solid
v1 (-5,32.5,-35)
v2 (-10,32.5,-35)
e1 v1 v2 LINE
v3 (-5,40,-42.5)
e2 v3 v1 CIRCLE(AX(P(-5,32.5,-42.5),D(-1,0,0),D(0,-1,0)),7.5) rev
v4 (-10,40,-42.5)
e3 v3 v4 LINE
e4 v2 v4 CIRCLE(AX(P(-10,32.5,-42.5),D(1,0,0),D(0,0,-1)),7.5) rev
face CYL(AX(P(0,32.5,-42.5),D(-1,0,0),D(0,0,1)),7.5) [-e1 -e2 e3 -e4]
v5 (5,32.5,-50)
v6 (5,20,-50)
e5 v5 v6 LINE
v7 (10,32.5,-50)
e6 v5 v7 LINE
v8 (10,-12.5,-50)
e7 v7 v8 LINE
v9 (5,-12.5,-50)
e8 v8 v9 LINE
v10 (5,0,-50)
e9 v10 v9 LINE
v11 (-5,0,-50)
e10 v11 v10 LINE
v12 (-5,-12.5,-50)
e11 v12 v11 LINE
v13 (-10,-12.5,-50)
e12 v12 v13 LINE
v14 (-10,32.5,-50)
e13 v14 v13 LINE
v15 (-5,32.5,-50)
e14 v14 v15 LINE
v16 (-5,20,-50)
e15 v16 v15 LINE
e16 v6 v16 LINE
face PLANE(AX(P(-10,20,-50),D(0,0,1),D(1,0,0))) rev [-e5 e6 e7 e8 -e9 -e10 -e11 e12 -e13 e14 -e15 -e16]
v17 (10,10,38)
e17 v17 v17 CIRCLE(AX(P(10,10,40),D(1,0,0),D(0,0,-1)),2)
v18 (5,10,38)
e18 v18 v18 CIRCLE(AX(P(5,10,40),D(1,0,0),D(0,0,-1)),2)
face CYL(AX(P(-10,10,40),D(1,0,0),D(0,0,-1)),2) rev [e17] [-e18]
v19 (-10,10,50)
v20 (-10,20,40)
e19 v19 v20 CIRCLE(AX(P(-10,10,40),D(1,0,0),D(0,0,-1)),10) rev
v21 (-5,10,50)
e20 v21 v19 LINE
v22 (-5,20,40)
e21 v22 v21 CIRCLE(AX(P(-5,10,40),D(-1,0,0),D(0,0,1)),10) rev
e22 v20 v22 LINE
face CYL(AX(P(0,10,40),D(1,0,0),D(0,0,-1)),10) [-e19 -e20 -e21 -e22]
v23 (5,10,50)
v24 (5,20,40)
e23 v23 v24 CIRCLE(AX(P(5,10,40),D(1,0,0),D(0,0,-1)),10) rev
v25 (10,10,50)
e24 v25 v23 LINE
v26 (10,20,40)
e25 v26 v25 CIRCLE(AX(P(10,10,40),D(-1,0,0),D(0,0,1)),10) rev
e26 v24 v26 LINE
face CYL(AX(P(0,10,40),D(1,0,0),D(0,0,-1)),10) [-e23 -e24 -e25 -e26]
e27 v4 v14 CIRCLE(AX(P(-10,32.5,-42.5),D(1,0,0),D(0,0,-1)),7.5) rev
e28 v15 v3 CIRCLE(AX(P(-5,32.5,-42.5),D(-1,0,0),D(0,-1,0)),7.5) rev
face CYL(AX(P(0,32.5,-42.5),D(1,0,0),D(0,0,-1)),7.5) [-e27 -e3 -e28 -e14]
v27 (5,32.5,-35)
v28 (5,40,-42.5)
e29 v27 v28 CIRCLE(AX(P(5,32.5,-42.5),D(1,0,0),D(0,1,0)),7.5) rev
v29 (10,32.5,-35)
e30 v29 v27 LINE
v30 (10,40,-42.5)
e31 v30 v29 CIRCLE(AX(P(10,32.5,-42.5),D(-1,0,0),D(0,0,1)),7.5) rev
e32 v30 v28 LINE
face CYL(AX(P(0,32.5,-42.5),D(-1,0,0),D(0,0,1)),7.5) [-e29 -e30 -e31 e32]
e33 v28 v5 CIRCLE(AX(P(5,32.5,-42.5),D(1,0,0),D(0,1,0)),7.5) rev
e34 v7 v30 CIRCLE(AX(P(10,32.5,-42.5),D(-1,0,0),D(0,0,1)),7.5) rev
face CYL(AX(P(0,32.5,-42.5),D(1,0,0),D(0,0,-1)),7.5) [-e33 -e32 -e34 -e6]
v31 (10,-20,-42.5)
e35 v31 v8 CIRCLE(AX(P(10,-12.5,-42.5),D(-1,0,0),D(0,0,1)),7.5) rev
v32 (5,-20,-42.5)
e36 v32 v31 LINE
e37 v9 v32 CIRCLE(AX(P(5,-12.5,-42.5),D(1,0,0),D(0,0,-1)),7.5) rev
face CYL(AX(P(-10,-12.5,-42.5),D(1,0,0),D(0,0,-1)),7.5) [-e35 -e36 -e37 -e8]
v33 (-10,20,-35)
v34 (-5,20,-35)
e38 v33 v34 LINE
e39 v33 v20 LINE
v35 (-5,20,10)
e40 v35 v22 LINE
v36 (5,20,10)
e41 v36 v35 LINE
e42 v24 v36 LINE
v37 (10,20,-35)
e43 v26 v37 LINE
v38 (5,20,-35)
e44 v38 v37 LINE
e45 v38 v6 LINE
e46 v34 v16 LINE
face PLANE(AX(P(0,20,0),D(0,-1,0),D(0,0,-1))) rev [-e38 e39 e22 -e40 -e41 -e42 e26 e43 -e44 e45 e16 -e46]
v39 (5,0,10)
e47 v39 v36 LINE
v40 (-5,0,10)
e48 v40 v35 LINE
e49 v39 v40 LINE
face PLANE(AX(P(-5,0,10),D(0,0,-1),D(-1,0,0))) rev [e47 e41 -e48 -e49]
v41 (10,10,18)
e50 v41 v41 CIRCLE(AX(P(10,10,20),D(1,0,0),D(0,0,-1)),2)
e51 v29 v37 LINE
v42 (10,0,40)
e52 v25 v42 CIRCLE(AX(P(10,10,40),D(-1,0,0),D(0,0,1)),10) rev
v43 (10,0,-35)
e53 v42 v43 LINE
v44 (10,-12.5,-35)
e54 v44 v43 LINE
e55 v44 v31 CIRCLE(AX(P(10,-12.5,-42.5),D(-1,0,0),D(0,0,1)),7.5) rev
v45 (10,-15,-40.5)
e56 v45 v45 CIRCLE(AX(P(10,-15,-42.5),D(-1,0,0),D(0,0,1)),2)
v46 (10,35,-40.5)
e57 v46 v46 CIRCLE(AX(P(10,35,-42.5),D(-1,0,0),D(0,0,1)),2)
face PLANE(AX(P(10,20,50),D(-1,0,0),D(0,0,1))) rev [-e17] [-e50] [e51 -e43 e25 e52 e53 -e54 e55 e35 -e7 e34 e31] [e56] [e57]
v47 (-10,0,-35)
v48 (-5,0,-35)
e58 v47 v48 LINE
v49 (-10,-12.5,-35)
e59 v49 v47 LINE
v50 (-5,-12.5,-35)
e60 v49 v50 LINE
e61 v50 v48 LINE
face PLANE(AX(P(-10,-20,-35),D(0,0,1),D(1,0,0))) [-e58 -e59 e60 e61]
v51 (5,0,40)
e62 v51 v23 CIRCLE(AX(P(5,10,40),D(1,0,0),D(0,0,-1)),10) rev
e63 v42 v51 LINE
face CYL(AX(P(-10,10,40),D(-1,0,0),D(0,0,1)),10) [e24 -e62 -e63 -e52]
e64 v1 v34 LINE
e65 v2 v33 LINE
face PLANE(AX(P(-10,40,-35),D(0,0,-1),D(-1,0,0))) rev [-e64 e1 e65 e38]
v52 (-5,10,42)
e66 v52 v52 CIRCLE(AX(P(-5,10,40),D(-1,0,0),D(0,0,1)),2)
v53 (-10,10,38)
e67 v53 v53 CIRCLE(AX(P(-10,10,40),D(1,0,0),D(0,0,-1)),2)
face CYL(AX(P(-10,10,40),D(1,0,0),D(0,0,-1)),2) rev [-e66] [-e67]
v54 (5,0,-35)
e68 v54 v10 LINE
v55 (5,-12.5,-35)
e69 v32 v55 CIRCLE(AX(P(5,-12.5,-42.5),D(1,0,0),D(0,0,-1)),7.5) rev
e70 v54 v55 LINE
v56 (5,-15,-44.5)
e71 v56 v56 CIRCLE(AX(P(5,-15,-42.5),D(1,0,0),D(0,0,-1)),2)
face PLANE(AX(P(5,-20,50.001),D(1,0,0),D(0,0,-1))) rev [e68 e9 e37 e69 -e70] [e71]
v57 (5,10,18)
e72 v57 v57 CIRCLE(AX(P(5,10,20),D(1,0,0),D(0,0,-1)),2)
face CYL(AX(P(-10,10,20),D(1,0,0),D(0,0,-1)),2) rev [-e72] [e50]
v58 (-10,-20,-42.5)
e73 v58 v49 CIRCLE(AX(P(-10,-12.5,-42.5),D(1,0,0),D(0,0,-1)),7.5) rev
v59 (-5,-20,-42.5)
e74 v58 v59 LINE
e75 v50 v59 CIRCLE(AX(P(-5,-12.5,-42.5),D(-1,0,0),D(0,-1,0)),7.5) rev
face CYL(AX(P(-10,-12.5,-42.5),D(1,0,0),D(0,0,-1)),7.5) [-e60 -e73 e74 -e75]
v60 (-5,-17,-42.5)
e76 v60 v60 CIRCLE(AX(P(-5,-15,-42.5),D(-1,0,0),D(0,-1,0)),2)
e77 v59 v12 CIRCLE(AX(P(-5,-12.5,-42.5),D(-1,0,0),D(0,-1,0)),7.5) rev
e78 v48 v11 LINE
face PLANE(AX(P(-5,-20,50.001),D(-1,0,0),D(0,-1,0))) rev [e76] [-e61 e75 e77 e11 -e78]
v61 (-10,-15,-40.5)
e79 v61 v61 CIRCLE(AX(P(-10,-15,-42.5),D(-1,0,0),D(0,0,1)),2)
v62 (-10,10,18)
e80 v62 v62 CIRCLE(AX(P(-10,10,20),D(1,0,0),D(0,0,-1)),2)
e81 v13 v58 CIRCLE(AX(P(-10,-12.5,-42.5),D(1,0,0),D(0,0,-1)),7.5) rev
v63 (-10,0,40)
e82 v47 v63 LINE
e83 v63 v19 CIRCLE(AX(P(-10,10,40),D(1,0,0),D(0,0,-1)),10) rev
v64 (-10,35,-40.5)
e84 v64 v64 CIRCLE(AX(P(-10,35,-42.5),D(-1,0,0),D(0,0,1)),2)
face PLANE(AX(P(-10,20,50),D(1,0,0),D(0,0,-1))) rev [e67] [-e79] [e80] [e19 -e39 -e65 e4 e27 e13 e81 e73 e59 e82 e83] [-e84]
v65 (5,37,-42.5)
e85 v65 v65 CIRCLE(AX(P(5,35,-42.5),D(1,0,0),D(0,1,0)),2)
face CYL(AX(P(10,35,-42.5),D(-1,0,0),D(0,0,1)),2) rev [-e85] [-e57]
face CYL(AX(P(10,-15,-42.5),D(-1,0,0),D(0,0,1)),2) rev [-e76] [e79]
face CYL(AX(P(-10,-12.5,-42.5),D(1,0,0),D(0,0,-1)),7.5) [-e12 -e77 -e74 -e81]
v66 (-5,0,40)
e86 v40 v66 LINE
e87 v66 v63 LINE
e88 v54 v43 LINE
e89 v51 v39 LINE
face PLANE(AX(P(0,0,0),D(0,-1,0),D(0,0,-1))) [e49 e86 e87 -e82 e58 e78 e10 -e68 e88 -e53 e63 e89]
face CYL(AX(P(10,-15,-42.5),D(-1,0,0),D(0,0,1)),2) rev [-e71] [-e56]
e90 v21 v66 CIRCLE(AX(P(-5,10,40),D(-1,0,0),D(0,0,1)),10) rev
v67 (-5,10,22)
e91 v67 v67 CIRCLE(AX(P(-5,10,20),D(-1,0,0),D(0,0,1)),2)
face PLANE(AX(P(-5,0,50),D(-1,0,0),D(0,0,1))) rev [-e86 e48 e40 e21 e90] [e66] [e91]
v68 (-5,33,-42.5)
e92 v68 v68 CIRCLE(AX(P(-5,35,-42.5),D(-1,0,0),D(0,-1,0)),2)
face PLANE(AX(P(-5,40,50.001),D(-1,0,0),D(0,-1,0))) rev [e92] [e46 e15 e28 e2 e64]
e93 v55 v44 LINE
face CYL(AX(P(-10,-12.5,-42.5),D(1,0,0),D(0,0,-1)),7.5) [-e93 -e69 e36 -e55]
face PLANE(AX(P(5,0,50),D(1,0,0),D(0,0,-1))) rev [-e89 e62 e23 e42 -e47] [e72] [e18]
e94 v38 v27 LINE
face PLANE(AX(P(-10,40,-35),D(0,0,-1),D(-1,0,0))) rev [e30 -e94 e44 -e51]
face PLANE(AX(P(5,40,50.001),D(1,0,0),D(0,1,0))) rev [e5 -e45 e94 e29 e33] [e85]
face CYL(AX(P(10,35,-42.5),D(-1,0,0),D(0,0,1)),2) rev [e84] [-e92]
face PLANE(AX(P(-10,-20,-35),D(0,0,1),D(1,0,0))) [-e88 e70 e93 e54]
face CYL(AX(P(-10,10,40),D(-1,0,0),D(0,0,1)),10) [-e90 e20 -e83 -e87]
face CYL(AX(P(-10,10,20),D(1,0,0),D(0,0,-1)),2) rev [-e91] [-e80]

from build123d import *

# Parameters (mm, degrees)
SKETCH1_W           = 20
SKETCH1_H           = 100
BOSS_EXTRUDE1_DEPTH = 20
SKETCH2_W           = 10
SKETCH2_H           = 40
CUT_EXTRUDE1_DEPTH  = 55.772255751
SKETCH3_R           = 2
CUT_EXTRUDE2_DEPTH  = 58.445626465
FILLET1_R           = 10
SKETCH4_W           = 20
SKETCH4_H           = 15
BOSS_EXTRUDE2_DEPTH = 20
SKETCH5_R           = 2
CUT_EXTRUDE3_DEPTH  = 68.082039325
CUT_EXTRUDE4_REACH  = 110.167
SKETCH6_W           = 10
SKETCH6_H           = 20
FILLET2_R           = 7.5


with BuildPart() as part:
    # Sketch1 → Boss-Extrude1 (new body)
    with BuildSketch(Plane(origin=(0, 0, 0), x_dir=(1, 0, 0), z_dir=(0, 1, 0))):
        Rectangle(SKETCH1_W, SKETCH1_H)
    extrude(amount=BOSS_EXTRUDE1_DEPTH)

    # Sketch2 → Cut-Extrude1 (cut, through all)
    with BuildSketch(Plane(origin=(0, 20, 0), x_dir=(1, 0, 0), z_dir=(0, 1, 0))):
        with Locations((0, -30)):
            Rectangle(SKETCH2_W, SKETCH2_H)
    extrude(amount=-CUT_EXTRUDE1_DEPTH, mode=Mode.SUBTRACT)

    # Sketch3 → Cut-Extrude2 (cut, through all)
    with BuildSketch(Plane(origin=(10, 0, 0), x_dir=(0, 0, -1), z_dir=(1, 0, 0))):
        with Locations((-40, 10)):
            Circle(SKETCH3_R)
        with Locations((-20, 10)):
            Circle(SKETCH3_R)
    extrude(amount=-CUT_EXTRUDE2_DEPTH, mode=Mode.SUBTRACT)

    # Fillet1
    fillet1_edges = [part.edges().sort_by_distance(p)[0] for p in [
        (7.5, 0, 50),
        (-7.5, 0, 50),
        (-7.5, 20, 50),
        (7.5, 20, 50),
    ]]
    fillet(fillet1_edges, radius=FILLET1_R - 0.0001)  # a hair under: the kernel refuses the full size

    # Sketch4 → Boss-Extrude2 (add)
    with BuildSketch(Plane(origin=(0, 20, 0), x_dir=(1, 0, 0), z_dir=(0, 1, 0))):
        with Locations((0, 42.5)):
            Rectangle(SKETCH4_W, SKETCH4_H)
    boss_extrude2 = extrude(amount=BOSS_EXTRUDE2_DEPTH)

    # Mirror1: Boss-Extrude2 across plane
    add(boss_extrude2.mirror(Plane.ZX.offset(10)))

    # Sketch5 → Cut-Extrude3 (cut, through all)
    with BuildSketch(Plane.ZY.offset(10)):
        with Locations((-42.5, 35)):
            Circle(SKETCH5_R)
        with Locations((-42.5, -15)):
            Circle(SKETCH5_R)
    extrude(amount=-CUT_EXTRUDE3_DEPTH, mode=Mode.SUBTRACT)

    # Sketch6 → Cut-Extrude4 (cut, up to next)
    with BuildSketch(Plane(origin=(0, 0, -50), x_dir=(-1, 0, 0), z_dir=(0, 0, -1)), mode=Mode.PRIVATE) as cut_extrude4_sk1:
        with Locations((0, 30)):
            Rectangle(SKETCH6_W, SKETCH6_H)
    cut_extrude4_tool1 = extrude(cut_extrude4_sk1.sketch, amount=-CUT_EXTRUDE4_REACH, mode=Mode.PRIVATE) & part.part
    # Sketch6 → Cut-Extrude4 (cut, up to next)
    with BuildSketch(Plane(origin=(0, 0, -50), x_dir=(-1, 0, 0), z_dir=(0, 0, -1)), mode=Mode.PRIVATE) as cut_extrude4_sk2:
        with Locations((0, -10)):
            Rectangle(SKETCH6_W, SKETCH6_H)
    cut_extrude4_tool2 = extrude(cut_extrude4_sk2.sketch, amount=-CUT_EXTRUDE4_REACH, mode=Mode.PRIVATE) & part.part
    add(cut_extrude4_tool1.solids().sort_by_distance((0, 30, -50))[0], mode=Mode.SUBTRACT)
    add(cut_extrude4_tool2.solids().sort_by_distance((0, -10, -50))[0], mode=Mode.SUBTRACT)

    # Fillet2
    fillet2_edges = [part.edges().sort_by_distance(p)[0] for p in [
        (-7.5, 40, -35),
        (-7.5, 40, -50),
        (7.5, 40, -35),
        (7.5, 40, -50),
        (7.5, -20, -35),
        (7.5, -20, -50),
        (-7.5, -20, -35),
        (-7.5, -20, -50),
    ]]
    fillet(fillet2_edges, radius=FILLET2_R - 0.0001)  # a hair under: the kernel refuses the full size


solid = part.part
